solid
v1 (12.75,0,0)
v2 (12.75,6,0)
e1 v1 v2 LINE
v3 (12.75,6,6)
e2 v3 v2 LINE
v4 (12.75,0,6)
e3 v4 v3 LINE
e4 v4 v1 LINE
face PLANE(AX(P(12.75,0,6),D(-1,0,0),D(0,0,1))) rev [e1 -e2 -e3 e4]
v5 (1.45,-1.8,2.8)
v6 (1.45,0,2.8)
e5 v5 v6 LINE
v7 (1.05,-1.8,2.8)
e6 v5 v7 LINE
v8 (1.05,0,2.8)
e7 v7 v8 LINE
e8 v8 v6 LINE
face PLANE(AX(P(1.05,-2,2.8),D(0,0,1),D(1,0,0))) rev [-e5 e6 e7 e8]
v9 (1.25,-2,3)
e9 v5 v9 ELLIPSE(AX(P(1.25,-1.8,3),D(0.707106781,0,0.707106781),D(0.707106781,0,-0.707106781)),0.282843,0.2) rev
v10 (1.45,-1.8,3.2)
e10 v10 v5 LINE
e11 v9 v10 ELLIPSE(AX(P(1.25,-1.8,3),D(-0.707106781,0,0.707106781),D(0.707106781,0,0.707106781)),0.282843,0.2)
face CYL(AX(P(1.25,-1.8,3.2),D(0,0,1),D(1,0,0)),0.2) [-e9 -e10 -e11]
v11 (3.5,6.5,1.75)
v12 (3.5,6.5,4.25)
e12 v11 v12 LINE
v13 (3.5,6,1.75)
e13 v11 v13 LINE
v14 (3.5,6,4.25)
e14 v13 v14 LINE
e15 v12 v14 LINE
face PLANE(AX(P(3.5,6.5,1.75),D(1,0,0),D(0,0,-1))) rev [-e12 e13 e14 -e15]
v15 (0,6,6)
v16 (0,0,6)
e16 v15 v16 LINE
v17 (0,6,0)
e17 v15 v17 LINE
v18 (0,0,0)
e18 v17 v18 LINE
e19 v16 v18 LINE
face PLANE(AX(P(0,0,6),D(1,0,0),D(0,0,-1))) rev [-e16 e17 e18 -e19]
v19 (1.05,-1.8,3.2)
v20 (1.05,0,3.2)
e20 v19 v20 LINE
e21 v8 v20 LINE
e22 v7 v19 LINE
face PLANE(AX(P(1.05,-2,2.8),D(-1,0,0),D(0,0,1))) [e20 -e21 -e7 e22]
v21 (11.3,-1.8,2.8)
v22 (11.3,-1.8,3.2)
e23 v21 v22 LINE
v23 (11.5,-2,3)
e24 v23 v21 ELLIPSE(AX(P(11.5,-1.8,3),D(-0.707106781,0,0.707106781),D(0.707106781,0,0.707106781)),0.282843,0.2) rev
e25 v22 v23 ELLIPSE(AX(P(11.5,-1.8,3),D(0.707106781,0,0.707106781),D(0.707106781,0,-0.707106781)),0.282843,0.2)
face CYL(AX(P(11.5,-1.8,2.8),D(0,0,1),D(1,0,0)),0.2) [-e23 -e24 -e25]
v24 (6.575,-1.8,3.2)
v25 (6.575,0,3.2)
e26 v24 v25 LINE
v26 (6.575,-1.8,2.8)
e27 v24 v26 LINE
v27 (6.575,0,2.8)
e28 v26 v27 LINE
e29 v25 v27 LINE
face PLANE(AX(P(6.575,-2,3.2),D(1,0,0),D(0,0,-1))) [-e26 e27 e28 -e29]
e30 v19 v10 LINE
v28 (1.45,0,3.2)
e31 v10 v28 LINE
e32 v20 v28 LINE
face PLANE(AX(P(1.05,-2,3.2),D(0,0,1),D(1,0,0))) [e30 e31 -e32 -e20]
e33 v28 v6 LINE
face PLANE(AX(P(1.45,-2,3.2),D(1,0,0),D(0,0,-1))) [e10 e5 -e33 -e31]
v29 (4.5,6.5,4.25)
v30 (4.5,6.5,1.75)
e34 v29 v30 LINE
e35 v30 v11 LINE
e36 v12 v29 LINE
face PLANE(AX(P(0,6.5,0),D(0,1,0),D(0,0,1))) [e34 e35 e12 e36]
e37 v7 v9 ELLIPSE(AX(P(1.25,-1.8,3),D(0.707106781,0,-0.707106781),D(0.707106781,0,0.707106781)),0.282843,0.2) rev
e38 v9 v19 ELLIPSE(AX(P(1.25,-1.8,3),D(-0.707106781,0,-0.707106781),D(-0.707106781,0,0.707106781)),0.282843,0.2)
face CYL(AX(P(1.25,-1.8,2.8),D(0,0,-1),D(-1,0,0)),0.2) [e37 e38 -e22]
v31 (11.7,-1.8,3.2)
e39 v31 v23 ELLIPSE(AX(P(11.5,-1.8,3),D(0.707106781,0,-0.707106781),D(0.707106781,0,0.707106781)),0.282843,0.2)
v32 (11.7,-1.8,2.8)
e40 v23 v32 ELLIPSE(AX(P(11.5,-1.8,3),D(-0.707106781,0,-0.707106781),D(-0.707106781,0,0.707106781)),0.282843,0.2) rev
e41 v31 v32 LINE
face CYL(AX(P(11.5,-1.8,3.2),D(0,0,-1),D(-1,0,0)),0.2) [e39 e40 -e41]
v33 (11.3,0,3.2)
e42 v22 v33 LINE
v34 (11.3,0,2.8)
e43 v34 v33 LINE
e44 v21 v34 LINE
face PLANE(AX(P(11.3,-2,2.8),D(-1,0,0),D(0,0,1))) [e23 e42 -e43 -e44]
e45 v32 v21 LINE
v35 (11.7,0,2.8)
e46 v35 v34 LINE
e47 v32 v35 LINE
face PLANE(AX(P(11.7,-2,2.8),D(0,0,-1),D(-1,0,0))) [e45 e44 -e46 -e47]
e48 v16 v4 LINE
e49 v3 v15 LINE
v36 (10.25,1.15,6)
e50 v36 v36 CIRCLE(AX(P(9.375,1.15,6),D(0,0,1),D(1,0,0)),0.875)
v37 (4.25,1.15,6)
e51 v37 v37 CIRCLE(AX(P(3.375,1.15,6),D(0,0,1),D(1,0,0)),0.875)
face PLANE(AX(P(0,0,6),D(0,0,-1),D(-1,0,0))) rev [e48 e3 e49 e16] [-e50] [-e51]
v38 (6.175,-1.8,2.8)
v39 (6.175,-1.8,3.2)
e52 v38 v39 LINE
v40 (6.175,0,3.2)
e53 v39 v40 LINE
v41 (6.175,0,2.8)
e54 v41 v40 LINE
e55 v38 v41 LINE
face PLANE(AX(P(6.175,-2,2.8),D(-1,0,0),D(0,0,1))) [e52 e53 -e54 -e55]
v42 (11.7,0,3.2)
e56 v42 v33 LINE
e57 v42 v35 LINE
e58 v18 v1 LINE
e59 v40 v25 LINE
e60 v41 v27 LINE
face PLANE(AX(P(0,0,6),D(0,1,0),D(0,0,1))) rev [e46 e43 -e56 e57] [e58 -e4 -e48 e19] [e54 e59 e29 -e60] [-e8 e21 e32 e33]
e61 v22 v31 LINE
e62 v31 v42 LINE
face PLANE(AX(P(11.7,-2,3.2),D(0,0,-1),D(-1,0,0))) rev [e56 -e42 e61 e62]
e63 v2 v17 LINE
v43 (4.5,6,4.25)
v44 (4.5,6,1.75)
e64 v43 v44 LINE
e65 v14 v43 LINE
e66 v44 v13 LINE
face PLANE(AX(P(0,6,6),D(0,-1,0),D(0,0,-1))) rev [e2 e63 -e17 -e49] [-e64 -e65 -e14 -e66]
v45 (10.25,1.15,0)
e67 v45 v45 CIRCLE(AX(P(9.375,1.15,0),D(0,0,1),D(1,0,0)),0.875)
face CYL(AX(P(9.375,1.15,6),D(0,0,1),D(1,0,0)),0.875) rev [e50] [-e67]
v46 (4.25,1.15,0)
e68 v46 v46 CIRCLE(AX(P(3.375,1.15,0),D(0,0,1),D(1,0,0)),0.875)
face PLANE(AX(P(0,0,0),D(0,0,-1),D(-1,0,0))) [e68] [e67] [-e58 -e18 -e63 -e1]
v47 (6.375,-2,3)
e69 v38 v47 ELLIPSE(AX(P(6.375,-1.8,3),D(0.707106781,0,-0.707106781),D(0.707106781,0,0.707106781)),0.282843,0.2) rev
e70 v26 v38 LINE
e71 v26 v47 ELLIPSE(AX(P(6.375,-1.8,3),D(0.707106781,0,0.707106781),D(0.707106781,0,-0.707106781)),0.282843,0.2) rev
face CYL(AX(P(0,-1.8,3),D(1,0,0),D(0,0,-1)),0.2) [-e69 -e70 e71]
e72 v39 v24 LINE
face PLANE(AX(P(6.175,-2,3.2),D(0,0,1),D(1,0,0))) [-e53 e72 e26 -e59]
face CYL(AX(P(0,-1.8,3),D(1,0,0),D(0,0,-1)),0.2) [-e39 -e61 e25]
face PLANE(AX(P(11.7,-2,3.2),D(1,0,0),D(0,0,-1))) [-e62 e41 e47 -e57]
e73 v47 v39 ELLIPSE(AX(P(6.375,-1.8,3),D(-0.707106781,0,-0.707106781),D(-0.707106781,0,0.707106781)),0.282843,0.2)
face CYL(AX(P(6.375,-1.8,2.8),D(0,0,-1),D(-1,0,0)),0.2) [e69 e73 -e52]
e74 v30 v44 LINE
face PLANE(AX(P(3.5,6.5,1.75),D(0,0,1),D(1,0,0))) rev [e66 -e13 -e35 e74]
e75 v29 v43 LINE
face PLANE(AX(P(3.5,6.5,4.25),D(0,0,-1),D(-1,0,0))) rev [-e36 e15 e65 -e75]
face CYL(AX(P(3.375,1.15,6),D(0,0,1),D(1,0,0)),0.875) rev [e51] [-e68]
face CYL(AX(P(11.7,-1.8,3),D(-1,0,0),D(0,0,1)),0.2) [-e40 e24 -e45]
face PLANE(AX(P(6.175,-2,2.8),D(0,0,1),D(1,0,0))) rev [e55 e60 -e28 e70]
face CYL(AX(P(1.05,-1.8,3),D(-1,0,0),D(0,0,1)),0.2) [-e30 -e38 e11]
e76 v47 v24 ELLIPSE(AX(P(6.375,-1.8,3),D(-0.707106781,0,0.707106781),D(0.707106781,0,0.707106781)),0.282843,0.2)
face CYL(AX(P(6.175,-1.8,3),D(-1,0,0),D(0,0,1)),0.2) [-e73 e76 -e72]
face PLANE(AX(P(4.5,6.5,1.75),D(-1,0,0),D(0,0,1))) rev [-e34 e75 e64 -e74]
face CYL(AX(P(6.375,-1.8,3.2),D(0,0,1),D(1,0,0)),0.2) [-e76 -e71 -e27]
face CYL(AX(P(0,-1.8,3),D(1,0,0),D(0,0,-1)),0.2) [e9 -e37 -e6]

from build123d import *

# Parameters (mm, degrees)
SKETCH1_W             = 12.75
SKETCH1_H             = 6
BOSS_EXTRUDE1_DEPTH   = 6
F_1_0MM_DOWEL_HOLE1_D = 1.75
SKETCH4_W             = 1
SKETCH4_H             = 2.5
BOSS_EXTRUDE2_DEPTH   = 0.5
SKETCH7_W             = 0.4
SKETCH7_H             = 0.4
EXTRUDE_THIN6_DEPTH   = 2
FILLET9_R             = 0.2


with BuildPart() as part:
    # Sketch1 → Boss-Extrude1 (new body)
    with BuildSketch(Plane.XY):
        with Locations((6.375, 3)):
            Rectangle(SKETCH1_W, SKETCH1_H)
    extrude(amount=BOSS_EXTRUDE1_DEPTH)

    # Ø1.0mm Dowel Hole1 (through all)
    with Locations(Plane.XY.offset(6)):
        with Locations((3.375, 1.15), (9.375, 1.15)):
            Hole(F_1_0MM_DOWEL_HOLE1_D / 2)

    # Sketch4 → Boss-Extrude2 (add)
    with BuildSketch(Plane(origin=(0, 6, 0), x_dir=(1, 0, 0), z_dir=(0, 1, 0))):
        with Locations((4, -3)):
            Rectangle(SKETCH4_W, SKETCH4_H)
    extrude(amount=BOSS_EXTRUDE2_DEPTH)

    # Sketch7 → Extrude-Thin6 (add)
    with BuildSketch(Plane.XZ):
        with Locations((11.5, 3)):
            Rectangle(SKETCH7_W, SKETCH7_H)
        with Locations((6.375, 3)):
            Rectangle(SKETCH7_W, SKETCH7_H)
        with Locations((1.25, 3)):
            Rectangle(SKETCH7_W, SKETCH7_H)
    extrude(amount=EXTRUDE_THIN6_DEPTH)

    # Fillet9
    fillet9_edges = [part.edges().sort_by_distance(p)[0] for p in [
        (6.575, -2, 3),
        (6.375, -2, 3.2),
        (6.175, -2, 3),
        (6.375, -2, 2.8),
        (1.45, -2, 3),
        (1.25, -2, 3.2),
        (1.05, -2, 3),
        (1.25, -2, 2.8),
        (11.3, -2, 3),
        (11.5, -2, 2.8),
        (11.7, -2, 3),
        (11.5, -2, 3.2),
    ]]
    fillet(fillet9_edges, radius=FILLET9_R - 0.0001)  # a hair under: the kernel refuses the full size


solid = part.part
